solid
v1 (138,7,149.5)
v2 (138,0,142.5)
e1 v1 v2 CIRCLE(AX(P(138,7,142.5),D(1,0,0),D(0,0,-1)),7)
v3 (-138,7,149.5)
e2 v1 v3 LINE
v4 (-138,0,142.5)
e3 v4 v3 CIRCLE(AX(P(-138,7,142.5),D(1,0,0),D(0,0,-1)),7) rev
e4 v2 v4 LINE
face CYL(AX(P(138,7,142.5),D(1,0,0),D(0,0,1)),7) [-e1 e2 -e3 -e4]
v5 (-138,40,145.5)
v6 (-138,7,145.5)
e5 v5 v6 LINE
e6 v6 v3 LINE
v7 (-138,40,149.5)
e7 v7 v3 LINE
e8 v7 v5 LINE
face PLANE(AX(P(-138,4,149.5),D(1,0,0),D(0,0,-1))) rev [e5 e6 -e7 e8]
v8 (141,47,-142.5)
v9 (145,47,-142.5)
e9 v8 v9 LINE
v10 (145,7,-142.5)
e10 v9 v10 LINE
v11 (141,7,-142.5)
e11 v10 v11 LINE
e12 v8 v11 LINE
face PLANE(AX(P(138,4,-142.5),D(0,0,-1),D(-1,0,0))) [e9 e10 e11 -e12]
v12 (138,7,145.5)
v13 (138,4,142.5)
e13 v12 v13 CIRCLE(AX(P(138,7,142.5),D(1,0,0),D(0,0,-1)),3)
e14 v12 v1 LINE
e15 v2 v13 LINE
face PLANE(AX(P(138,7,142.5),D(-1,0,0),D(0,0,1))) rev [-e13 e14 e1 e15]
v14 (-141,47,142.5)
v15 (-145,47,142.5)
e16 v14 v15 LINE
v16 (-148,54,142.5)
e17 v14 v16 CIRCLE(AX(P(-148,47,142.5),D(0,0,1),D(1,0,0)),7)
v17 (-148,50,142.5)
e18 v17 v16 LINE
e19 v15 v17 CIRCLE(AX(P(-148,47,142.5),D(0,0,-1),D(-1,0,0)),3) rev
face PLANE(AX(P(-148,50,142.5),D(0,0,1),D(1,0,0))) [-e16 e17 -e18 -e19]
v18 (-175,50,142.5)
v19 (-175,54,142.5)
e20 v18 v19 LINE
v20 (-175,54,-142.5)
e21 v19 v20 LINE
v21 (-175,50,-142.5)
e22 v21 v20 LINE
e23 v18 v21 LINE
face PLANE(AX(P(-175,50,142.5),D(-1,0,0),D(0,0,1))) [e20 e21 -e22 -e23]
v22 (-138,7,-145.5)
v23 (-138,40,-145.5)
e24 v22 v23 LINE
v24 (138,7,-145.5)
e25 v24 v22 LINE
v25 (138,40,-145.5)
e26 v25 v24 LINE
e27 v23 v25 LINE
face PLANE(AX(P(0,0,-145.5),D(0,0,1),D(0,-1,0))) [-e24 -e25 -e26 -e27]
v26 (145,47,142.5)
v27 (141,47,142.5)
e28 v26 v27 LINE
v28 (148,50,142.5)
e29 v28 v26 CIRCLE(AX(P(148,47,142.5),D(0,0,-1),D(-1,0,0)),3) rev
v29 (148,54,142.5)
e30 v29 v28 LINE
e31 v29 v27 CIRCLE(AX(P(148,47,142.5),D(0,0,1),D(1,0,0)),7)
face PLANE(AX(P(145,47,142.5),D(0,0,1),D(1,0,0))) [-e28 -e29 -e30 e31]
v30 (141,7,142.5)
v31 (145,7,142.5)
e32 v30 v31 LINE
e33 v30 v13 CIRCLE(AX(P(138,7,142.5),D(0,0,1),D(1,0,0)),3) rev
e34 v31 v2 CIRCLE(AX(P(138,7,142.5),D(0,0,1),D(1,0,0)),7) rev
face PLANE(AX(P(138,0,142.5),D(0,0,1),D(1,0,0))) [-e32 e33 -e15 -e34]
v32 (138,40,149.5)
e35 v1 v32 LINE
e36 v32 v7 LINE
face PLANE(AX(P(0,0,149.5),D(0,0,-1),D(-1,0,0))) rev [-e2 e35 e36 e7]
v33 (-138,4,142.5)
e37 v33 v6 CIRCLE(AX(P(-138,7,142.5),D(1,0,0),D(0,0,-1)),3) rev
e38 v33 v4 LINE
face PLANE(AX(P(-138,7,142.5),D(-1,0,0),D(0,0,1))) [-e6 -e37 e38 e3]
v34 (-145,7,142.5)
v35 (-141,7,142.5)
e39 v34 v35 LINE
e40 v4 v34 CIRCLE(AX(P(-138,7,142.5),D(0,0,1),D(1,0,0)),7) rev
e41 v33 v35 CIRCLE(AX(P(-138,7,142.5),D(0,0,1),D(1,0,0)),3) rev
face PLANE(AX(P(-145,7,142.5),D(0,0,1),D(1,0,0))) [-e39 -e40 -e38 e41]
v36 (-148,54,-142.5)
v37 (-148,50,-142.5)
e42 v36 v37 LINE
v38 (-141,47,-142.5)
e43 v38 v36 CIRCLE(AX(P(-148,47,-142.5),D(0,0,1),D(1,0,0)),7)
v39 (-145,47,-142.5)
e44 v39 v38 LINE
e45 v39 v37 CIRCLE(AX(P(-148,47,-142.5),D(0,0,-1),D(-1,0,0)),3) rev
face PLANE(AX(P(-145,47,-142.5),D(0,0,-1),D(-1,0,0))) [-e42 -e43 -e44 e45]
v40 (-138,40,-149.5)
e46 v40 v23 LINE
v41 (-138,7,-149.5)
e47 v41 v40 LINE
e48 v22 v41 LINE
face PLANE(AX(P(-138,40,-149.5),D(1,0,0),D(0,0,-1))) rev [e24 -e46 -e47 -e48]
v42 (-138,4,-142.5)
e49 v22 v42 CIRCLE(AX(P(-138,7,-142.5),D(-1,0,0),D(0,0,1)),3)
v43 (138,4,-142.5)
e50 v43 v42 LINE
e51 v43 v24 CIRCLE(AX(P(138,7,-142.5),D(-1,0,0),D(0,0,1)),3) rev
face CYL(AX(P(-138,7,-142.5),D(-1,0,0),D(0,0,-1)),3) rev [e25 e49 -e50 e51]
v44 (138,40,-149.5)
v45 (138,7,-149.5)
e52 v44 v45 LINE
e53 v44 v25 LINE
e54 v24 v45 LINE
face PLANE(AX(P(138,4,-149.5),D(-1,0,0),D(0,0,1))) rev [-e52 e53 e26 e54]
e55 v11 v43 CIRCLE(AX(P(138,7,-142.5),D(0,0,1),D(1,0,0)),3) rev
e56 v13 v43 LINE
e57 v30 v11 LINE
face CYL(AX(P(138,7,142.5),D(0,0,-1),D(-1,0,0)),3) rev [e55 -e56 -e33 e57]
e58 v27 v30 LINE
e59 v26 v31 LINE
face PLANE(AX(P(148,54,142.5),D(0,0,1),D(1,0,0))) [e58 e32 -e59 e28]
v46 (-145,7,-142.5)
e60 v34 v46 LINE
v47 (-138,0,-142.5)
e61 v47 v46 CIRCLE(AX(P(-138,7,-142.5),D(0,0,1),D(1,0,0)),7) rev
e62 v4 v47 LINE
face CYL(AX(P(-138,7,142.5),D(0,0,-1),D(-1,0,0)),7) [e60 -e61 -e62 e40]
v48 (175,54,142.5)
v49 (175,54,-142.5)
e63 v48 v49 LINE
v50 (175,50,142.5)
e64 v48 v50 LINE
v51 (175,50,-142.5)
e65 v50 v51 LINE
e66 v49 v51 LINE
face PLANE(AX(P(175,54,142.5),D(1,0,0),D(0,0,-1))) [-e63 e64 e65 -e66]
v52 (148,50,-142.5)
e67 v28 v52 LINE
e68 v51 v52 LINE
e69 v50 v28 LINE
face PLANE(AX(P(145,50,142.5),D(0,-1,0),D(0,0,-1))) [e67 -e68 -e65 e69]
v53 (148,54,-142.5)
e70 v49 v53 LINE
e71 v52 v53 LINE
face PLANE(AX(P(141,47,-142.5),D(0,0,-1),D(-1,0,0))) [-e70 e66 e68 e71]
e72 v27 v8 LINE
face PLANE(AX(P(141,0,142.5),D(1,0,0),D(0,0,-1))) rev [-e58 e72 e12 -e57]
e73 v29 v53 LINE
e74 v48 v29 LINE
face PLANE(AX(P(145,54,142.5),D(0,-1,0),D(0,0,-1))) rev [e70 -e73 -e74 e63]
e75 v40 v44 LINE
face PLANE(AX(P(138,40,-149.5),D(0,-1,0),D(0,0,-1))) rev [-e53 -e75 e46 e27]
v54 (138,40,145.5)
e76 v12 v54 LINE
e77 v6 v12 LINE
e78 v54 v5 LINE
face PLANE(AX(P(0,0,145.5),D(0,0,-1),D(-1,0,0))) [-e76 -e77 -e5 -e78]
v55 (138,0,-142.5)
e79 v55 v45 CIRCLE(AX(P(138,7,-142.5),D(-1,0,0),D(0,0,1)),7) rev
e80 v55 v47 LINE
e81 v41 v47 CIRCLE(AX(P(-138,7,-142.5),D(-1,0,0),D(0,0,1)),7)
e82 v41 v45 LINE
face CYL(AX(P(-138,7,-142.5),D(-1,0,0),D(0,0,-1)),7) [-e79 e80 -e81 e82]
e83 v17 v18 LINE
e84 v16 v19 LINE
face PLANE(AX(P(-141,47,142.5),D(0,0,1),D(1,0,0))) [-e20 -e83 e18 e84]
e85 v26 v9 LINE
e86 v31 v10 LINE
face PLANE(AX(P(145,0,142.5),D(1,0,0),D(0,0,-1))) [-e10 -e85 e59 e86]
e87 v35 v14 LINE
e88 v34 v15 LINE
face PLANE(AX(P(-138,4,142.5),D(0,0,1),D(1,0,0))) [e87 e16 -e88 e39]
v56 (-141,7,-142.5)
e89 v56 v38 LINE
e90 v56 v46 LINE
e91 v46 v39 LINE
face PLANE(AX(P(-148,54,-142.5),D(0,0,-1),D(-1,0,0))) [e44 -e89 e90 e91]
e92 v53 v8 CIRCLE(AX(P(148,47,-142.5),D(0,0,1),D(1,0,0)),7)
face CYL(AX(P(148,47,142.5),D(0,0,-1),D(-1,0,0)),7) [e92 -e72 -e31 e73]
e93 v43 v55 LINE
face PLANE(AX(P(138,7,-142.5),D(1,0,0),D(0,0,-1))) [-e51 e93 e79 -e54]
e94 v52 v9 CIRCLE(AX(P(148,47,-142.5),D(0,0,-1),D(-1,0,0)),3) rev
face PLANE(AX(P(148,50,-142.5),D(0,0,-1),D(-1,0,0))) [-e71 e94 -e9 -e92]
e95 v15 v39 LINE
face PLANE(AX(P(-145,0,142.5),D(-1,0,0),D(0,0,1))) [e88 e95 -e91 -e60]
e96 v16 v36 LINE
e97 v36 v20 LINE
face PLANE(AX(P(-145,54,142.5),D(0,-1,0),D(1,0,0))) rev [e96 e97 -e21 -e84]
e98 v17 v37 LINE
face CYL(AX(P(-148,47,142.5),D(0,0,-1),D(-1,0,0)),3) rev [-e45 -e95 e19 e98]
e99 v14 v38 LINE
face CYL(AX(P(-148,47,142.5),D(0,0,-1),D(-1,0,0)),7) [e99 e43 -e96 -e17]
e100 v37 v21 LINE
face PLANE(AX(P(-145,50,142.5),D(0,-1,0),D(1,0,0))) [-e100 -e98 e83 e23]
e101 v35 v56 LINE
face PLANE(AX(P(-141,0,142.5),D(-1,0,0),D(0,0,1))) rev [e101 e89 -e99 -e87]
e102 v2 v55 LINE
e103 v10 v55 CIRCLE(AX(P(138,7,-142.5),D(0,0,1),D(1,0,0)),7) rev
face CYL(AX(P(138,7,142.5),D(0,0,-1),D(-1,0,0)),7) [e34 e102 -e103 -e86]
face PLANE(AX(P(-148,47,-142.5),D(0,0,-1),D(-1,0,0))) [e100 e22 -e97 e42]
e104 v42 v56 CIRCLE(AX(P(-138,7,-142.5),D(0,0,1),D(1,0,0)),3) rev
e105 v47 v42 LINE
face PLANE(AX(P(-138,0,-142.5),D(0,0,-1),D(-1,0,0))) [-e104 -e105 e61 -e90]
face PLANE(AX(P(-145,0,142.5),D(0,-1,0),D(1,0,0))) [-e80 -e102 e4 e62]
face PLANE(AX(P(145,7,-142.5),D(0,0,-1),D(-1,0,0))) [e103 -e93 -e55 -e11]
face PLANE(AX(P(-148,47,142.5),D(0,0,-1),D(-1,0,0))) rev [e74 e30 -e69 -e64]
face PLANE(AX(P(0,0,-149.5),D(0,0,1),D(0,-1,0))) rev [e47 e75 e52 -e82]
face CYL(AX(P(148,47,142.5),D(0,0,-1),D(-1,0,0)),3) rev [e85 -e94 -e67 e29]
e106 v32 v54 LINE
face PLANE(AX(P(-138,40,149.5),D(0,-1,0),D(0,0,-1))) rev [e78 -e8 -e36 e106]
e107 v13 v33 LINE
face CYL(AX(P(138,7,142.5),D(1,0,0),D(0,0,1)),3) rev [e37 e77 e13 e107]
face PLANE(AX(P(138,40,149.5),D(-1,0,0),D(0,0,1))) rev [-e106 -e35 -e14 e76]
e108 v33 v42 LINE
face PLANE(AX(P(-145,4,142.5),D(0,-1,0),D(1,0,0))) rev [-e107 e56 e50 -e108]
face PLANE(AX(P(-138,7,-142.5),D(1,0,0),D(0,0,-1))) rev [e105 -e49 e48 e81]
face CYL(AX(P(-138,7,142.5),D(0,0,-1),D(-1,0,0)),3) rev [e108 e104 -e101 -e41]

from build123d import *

# Parameters (mm, degrees)
BASE_FLANGIA1_DEPTH       = 142.5
BORDO_FLANGIA1_DEPTH      = 276
BORDO_FLANGIA1_BEND_DEPTH = 276


# Sheet-metal steps are written as plain solids
with BuildPart() as part:
    # Schizzo1 → Base-Flangia1 (new, symmetric)
    with BuildSketch(Plane.XY):
        with BuildLine():
            Line((-175, 50), (-148, 50))
            ThreePointArc((-148, 50), (-145.878679656, 49.121320344), (-145, 47))
            Line((-145, 47), (-145, 7))
            ThreePointArc((-145, 7), (-142.949747468, 2.050252532), (-138, 0))
            Line((-138, 0), (138, 0))
            ThreePointArc((138, 0), (142.949747468, 2.050252532), (145, 7))
            Line((145, 7), (145, 47))
            ThreePointArc((145, 47), (145.878679656, 49.121320344), (148, 50))
            Line((148, 50), (175, 50))
            Line((175, 50), (175, 54))
            Line((175, 54), (148, 54))
            ThreePointArc((148, 54), (143.050252532, 51.949747468), (141, 47))
            Line((141, 47), (141, 7))
            ThreePointArc((141, 7), (140.121320344, 4.878679656), (138, 4))
            Line((138, 4), (-138, 4))
            ThreePointArc((-138, 4), (-140.121320344, 4.878679656), (-141, 7))
            Line((-141, 7), (-141, 47))
            ThreePointArc((-141, 47), (-143.050252532, 51.949747468), (-148, 54))
            Line((-148, 54), (-175, 54))
            Line((-175, 54), (-175, 50))
        make_face()
    extrude(amount=BASE_FLANGIA1_DEPTH, both=True)

    # Bordo-Flangia1 section (across the edge) → Bordo-Flangia1 (add)
    with BuildSketch(Plane(origin=(-138, 4, 145.5), x_dir=(0, 0, -1), z_dir=(1, 0, 0))):
        with BuildLine():
            Line((-4, 3), (-4, 36))
            Line((-4, 36), (0, 36))
            Line((0, 36), (0, 3))
            ThreePointArc((0, 3), (0.878679656, 0.878679656), (3, 0))
            Line((3, 0), (3, -4))
            ThreePointArc((3, -4), (-1.949747468, -1.949747468), (-4, 3))
        make_face()
    extrude(amount=BORDO_FLANGIA1_DEPTH)

    # Bordo-Flangia1 section 2 (across the edge) → Bordo-Flangia1 bend (add)
    with BuildSketch(Plane(origin=(138, 4, -145.5), x_dir=(0, 0, 1), z_dir=(-1, 0, 0))):
        with BuildLine():
            Line((-4, 3), (-4, 36))
            Line((-4, 36), (0, 36))
            Line((0, 36), (0, 3))
            ThreePointArc((0, 3), (0.878679656, 0.878679656), (3, 0))
            Line((3, 0), (3, -4))
            ThreePointArc((3, -4), (-1.949747468, -1.949747468), (-4, 3))
        make_face()
    extrude(amount=BORDO_FLANGIA1_BEND_DEPTH)


solid = part.part
